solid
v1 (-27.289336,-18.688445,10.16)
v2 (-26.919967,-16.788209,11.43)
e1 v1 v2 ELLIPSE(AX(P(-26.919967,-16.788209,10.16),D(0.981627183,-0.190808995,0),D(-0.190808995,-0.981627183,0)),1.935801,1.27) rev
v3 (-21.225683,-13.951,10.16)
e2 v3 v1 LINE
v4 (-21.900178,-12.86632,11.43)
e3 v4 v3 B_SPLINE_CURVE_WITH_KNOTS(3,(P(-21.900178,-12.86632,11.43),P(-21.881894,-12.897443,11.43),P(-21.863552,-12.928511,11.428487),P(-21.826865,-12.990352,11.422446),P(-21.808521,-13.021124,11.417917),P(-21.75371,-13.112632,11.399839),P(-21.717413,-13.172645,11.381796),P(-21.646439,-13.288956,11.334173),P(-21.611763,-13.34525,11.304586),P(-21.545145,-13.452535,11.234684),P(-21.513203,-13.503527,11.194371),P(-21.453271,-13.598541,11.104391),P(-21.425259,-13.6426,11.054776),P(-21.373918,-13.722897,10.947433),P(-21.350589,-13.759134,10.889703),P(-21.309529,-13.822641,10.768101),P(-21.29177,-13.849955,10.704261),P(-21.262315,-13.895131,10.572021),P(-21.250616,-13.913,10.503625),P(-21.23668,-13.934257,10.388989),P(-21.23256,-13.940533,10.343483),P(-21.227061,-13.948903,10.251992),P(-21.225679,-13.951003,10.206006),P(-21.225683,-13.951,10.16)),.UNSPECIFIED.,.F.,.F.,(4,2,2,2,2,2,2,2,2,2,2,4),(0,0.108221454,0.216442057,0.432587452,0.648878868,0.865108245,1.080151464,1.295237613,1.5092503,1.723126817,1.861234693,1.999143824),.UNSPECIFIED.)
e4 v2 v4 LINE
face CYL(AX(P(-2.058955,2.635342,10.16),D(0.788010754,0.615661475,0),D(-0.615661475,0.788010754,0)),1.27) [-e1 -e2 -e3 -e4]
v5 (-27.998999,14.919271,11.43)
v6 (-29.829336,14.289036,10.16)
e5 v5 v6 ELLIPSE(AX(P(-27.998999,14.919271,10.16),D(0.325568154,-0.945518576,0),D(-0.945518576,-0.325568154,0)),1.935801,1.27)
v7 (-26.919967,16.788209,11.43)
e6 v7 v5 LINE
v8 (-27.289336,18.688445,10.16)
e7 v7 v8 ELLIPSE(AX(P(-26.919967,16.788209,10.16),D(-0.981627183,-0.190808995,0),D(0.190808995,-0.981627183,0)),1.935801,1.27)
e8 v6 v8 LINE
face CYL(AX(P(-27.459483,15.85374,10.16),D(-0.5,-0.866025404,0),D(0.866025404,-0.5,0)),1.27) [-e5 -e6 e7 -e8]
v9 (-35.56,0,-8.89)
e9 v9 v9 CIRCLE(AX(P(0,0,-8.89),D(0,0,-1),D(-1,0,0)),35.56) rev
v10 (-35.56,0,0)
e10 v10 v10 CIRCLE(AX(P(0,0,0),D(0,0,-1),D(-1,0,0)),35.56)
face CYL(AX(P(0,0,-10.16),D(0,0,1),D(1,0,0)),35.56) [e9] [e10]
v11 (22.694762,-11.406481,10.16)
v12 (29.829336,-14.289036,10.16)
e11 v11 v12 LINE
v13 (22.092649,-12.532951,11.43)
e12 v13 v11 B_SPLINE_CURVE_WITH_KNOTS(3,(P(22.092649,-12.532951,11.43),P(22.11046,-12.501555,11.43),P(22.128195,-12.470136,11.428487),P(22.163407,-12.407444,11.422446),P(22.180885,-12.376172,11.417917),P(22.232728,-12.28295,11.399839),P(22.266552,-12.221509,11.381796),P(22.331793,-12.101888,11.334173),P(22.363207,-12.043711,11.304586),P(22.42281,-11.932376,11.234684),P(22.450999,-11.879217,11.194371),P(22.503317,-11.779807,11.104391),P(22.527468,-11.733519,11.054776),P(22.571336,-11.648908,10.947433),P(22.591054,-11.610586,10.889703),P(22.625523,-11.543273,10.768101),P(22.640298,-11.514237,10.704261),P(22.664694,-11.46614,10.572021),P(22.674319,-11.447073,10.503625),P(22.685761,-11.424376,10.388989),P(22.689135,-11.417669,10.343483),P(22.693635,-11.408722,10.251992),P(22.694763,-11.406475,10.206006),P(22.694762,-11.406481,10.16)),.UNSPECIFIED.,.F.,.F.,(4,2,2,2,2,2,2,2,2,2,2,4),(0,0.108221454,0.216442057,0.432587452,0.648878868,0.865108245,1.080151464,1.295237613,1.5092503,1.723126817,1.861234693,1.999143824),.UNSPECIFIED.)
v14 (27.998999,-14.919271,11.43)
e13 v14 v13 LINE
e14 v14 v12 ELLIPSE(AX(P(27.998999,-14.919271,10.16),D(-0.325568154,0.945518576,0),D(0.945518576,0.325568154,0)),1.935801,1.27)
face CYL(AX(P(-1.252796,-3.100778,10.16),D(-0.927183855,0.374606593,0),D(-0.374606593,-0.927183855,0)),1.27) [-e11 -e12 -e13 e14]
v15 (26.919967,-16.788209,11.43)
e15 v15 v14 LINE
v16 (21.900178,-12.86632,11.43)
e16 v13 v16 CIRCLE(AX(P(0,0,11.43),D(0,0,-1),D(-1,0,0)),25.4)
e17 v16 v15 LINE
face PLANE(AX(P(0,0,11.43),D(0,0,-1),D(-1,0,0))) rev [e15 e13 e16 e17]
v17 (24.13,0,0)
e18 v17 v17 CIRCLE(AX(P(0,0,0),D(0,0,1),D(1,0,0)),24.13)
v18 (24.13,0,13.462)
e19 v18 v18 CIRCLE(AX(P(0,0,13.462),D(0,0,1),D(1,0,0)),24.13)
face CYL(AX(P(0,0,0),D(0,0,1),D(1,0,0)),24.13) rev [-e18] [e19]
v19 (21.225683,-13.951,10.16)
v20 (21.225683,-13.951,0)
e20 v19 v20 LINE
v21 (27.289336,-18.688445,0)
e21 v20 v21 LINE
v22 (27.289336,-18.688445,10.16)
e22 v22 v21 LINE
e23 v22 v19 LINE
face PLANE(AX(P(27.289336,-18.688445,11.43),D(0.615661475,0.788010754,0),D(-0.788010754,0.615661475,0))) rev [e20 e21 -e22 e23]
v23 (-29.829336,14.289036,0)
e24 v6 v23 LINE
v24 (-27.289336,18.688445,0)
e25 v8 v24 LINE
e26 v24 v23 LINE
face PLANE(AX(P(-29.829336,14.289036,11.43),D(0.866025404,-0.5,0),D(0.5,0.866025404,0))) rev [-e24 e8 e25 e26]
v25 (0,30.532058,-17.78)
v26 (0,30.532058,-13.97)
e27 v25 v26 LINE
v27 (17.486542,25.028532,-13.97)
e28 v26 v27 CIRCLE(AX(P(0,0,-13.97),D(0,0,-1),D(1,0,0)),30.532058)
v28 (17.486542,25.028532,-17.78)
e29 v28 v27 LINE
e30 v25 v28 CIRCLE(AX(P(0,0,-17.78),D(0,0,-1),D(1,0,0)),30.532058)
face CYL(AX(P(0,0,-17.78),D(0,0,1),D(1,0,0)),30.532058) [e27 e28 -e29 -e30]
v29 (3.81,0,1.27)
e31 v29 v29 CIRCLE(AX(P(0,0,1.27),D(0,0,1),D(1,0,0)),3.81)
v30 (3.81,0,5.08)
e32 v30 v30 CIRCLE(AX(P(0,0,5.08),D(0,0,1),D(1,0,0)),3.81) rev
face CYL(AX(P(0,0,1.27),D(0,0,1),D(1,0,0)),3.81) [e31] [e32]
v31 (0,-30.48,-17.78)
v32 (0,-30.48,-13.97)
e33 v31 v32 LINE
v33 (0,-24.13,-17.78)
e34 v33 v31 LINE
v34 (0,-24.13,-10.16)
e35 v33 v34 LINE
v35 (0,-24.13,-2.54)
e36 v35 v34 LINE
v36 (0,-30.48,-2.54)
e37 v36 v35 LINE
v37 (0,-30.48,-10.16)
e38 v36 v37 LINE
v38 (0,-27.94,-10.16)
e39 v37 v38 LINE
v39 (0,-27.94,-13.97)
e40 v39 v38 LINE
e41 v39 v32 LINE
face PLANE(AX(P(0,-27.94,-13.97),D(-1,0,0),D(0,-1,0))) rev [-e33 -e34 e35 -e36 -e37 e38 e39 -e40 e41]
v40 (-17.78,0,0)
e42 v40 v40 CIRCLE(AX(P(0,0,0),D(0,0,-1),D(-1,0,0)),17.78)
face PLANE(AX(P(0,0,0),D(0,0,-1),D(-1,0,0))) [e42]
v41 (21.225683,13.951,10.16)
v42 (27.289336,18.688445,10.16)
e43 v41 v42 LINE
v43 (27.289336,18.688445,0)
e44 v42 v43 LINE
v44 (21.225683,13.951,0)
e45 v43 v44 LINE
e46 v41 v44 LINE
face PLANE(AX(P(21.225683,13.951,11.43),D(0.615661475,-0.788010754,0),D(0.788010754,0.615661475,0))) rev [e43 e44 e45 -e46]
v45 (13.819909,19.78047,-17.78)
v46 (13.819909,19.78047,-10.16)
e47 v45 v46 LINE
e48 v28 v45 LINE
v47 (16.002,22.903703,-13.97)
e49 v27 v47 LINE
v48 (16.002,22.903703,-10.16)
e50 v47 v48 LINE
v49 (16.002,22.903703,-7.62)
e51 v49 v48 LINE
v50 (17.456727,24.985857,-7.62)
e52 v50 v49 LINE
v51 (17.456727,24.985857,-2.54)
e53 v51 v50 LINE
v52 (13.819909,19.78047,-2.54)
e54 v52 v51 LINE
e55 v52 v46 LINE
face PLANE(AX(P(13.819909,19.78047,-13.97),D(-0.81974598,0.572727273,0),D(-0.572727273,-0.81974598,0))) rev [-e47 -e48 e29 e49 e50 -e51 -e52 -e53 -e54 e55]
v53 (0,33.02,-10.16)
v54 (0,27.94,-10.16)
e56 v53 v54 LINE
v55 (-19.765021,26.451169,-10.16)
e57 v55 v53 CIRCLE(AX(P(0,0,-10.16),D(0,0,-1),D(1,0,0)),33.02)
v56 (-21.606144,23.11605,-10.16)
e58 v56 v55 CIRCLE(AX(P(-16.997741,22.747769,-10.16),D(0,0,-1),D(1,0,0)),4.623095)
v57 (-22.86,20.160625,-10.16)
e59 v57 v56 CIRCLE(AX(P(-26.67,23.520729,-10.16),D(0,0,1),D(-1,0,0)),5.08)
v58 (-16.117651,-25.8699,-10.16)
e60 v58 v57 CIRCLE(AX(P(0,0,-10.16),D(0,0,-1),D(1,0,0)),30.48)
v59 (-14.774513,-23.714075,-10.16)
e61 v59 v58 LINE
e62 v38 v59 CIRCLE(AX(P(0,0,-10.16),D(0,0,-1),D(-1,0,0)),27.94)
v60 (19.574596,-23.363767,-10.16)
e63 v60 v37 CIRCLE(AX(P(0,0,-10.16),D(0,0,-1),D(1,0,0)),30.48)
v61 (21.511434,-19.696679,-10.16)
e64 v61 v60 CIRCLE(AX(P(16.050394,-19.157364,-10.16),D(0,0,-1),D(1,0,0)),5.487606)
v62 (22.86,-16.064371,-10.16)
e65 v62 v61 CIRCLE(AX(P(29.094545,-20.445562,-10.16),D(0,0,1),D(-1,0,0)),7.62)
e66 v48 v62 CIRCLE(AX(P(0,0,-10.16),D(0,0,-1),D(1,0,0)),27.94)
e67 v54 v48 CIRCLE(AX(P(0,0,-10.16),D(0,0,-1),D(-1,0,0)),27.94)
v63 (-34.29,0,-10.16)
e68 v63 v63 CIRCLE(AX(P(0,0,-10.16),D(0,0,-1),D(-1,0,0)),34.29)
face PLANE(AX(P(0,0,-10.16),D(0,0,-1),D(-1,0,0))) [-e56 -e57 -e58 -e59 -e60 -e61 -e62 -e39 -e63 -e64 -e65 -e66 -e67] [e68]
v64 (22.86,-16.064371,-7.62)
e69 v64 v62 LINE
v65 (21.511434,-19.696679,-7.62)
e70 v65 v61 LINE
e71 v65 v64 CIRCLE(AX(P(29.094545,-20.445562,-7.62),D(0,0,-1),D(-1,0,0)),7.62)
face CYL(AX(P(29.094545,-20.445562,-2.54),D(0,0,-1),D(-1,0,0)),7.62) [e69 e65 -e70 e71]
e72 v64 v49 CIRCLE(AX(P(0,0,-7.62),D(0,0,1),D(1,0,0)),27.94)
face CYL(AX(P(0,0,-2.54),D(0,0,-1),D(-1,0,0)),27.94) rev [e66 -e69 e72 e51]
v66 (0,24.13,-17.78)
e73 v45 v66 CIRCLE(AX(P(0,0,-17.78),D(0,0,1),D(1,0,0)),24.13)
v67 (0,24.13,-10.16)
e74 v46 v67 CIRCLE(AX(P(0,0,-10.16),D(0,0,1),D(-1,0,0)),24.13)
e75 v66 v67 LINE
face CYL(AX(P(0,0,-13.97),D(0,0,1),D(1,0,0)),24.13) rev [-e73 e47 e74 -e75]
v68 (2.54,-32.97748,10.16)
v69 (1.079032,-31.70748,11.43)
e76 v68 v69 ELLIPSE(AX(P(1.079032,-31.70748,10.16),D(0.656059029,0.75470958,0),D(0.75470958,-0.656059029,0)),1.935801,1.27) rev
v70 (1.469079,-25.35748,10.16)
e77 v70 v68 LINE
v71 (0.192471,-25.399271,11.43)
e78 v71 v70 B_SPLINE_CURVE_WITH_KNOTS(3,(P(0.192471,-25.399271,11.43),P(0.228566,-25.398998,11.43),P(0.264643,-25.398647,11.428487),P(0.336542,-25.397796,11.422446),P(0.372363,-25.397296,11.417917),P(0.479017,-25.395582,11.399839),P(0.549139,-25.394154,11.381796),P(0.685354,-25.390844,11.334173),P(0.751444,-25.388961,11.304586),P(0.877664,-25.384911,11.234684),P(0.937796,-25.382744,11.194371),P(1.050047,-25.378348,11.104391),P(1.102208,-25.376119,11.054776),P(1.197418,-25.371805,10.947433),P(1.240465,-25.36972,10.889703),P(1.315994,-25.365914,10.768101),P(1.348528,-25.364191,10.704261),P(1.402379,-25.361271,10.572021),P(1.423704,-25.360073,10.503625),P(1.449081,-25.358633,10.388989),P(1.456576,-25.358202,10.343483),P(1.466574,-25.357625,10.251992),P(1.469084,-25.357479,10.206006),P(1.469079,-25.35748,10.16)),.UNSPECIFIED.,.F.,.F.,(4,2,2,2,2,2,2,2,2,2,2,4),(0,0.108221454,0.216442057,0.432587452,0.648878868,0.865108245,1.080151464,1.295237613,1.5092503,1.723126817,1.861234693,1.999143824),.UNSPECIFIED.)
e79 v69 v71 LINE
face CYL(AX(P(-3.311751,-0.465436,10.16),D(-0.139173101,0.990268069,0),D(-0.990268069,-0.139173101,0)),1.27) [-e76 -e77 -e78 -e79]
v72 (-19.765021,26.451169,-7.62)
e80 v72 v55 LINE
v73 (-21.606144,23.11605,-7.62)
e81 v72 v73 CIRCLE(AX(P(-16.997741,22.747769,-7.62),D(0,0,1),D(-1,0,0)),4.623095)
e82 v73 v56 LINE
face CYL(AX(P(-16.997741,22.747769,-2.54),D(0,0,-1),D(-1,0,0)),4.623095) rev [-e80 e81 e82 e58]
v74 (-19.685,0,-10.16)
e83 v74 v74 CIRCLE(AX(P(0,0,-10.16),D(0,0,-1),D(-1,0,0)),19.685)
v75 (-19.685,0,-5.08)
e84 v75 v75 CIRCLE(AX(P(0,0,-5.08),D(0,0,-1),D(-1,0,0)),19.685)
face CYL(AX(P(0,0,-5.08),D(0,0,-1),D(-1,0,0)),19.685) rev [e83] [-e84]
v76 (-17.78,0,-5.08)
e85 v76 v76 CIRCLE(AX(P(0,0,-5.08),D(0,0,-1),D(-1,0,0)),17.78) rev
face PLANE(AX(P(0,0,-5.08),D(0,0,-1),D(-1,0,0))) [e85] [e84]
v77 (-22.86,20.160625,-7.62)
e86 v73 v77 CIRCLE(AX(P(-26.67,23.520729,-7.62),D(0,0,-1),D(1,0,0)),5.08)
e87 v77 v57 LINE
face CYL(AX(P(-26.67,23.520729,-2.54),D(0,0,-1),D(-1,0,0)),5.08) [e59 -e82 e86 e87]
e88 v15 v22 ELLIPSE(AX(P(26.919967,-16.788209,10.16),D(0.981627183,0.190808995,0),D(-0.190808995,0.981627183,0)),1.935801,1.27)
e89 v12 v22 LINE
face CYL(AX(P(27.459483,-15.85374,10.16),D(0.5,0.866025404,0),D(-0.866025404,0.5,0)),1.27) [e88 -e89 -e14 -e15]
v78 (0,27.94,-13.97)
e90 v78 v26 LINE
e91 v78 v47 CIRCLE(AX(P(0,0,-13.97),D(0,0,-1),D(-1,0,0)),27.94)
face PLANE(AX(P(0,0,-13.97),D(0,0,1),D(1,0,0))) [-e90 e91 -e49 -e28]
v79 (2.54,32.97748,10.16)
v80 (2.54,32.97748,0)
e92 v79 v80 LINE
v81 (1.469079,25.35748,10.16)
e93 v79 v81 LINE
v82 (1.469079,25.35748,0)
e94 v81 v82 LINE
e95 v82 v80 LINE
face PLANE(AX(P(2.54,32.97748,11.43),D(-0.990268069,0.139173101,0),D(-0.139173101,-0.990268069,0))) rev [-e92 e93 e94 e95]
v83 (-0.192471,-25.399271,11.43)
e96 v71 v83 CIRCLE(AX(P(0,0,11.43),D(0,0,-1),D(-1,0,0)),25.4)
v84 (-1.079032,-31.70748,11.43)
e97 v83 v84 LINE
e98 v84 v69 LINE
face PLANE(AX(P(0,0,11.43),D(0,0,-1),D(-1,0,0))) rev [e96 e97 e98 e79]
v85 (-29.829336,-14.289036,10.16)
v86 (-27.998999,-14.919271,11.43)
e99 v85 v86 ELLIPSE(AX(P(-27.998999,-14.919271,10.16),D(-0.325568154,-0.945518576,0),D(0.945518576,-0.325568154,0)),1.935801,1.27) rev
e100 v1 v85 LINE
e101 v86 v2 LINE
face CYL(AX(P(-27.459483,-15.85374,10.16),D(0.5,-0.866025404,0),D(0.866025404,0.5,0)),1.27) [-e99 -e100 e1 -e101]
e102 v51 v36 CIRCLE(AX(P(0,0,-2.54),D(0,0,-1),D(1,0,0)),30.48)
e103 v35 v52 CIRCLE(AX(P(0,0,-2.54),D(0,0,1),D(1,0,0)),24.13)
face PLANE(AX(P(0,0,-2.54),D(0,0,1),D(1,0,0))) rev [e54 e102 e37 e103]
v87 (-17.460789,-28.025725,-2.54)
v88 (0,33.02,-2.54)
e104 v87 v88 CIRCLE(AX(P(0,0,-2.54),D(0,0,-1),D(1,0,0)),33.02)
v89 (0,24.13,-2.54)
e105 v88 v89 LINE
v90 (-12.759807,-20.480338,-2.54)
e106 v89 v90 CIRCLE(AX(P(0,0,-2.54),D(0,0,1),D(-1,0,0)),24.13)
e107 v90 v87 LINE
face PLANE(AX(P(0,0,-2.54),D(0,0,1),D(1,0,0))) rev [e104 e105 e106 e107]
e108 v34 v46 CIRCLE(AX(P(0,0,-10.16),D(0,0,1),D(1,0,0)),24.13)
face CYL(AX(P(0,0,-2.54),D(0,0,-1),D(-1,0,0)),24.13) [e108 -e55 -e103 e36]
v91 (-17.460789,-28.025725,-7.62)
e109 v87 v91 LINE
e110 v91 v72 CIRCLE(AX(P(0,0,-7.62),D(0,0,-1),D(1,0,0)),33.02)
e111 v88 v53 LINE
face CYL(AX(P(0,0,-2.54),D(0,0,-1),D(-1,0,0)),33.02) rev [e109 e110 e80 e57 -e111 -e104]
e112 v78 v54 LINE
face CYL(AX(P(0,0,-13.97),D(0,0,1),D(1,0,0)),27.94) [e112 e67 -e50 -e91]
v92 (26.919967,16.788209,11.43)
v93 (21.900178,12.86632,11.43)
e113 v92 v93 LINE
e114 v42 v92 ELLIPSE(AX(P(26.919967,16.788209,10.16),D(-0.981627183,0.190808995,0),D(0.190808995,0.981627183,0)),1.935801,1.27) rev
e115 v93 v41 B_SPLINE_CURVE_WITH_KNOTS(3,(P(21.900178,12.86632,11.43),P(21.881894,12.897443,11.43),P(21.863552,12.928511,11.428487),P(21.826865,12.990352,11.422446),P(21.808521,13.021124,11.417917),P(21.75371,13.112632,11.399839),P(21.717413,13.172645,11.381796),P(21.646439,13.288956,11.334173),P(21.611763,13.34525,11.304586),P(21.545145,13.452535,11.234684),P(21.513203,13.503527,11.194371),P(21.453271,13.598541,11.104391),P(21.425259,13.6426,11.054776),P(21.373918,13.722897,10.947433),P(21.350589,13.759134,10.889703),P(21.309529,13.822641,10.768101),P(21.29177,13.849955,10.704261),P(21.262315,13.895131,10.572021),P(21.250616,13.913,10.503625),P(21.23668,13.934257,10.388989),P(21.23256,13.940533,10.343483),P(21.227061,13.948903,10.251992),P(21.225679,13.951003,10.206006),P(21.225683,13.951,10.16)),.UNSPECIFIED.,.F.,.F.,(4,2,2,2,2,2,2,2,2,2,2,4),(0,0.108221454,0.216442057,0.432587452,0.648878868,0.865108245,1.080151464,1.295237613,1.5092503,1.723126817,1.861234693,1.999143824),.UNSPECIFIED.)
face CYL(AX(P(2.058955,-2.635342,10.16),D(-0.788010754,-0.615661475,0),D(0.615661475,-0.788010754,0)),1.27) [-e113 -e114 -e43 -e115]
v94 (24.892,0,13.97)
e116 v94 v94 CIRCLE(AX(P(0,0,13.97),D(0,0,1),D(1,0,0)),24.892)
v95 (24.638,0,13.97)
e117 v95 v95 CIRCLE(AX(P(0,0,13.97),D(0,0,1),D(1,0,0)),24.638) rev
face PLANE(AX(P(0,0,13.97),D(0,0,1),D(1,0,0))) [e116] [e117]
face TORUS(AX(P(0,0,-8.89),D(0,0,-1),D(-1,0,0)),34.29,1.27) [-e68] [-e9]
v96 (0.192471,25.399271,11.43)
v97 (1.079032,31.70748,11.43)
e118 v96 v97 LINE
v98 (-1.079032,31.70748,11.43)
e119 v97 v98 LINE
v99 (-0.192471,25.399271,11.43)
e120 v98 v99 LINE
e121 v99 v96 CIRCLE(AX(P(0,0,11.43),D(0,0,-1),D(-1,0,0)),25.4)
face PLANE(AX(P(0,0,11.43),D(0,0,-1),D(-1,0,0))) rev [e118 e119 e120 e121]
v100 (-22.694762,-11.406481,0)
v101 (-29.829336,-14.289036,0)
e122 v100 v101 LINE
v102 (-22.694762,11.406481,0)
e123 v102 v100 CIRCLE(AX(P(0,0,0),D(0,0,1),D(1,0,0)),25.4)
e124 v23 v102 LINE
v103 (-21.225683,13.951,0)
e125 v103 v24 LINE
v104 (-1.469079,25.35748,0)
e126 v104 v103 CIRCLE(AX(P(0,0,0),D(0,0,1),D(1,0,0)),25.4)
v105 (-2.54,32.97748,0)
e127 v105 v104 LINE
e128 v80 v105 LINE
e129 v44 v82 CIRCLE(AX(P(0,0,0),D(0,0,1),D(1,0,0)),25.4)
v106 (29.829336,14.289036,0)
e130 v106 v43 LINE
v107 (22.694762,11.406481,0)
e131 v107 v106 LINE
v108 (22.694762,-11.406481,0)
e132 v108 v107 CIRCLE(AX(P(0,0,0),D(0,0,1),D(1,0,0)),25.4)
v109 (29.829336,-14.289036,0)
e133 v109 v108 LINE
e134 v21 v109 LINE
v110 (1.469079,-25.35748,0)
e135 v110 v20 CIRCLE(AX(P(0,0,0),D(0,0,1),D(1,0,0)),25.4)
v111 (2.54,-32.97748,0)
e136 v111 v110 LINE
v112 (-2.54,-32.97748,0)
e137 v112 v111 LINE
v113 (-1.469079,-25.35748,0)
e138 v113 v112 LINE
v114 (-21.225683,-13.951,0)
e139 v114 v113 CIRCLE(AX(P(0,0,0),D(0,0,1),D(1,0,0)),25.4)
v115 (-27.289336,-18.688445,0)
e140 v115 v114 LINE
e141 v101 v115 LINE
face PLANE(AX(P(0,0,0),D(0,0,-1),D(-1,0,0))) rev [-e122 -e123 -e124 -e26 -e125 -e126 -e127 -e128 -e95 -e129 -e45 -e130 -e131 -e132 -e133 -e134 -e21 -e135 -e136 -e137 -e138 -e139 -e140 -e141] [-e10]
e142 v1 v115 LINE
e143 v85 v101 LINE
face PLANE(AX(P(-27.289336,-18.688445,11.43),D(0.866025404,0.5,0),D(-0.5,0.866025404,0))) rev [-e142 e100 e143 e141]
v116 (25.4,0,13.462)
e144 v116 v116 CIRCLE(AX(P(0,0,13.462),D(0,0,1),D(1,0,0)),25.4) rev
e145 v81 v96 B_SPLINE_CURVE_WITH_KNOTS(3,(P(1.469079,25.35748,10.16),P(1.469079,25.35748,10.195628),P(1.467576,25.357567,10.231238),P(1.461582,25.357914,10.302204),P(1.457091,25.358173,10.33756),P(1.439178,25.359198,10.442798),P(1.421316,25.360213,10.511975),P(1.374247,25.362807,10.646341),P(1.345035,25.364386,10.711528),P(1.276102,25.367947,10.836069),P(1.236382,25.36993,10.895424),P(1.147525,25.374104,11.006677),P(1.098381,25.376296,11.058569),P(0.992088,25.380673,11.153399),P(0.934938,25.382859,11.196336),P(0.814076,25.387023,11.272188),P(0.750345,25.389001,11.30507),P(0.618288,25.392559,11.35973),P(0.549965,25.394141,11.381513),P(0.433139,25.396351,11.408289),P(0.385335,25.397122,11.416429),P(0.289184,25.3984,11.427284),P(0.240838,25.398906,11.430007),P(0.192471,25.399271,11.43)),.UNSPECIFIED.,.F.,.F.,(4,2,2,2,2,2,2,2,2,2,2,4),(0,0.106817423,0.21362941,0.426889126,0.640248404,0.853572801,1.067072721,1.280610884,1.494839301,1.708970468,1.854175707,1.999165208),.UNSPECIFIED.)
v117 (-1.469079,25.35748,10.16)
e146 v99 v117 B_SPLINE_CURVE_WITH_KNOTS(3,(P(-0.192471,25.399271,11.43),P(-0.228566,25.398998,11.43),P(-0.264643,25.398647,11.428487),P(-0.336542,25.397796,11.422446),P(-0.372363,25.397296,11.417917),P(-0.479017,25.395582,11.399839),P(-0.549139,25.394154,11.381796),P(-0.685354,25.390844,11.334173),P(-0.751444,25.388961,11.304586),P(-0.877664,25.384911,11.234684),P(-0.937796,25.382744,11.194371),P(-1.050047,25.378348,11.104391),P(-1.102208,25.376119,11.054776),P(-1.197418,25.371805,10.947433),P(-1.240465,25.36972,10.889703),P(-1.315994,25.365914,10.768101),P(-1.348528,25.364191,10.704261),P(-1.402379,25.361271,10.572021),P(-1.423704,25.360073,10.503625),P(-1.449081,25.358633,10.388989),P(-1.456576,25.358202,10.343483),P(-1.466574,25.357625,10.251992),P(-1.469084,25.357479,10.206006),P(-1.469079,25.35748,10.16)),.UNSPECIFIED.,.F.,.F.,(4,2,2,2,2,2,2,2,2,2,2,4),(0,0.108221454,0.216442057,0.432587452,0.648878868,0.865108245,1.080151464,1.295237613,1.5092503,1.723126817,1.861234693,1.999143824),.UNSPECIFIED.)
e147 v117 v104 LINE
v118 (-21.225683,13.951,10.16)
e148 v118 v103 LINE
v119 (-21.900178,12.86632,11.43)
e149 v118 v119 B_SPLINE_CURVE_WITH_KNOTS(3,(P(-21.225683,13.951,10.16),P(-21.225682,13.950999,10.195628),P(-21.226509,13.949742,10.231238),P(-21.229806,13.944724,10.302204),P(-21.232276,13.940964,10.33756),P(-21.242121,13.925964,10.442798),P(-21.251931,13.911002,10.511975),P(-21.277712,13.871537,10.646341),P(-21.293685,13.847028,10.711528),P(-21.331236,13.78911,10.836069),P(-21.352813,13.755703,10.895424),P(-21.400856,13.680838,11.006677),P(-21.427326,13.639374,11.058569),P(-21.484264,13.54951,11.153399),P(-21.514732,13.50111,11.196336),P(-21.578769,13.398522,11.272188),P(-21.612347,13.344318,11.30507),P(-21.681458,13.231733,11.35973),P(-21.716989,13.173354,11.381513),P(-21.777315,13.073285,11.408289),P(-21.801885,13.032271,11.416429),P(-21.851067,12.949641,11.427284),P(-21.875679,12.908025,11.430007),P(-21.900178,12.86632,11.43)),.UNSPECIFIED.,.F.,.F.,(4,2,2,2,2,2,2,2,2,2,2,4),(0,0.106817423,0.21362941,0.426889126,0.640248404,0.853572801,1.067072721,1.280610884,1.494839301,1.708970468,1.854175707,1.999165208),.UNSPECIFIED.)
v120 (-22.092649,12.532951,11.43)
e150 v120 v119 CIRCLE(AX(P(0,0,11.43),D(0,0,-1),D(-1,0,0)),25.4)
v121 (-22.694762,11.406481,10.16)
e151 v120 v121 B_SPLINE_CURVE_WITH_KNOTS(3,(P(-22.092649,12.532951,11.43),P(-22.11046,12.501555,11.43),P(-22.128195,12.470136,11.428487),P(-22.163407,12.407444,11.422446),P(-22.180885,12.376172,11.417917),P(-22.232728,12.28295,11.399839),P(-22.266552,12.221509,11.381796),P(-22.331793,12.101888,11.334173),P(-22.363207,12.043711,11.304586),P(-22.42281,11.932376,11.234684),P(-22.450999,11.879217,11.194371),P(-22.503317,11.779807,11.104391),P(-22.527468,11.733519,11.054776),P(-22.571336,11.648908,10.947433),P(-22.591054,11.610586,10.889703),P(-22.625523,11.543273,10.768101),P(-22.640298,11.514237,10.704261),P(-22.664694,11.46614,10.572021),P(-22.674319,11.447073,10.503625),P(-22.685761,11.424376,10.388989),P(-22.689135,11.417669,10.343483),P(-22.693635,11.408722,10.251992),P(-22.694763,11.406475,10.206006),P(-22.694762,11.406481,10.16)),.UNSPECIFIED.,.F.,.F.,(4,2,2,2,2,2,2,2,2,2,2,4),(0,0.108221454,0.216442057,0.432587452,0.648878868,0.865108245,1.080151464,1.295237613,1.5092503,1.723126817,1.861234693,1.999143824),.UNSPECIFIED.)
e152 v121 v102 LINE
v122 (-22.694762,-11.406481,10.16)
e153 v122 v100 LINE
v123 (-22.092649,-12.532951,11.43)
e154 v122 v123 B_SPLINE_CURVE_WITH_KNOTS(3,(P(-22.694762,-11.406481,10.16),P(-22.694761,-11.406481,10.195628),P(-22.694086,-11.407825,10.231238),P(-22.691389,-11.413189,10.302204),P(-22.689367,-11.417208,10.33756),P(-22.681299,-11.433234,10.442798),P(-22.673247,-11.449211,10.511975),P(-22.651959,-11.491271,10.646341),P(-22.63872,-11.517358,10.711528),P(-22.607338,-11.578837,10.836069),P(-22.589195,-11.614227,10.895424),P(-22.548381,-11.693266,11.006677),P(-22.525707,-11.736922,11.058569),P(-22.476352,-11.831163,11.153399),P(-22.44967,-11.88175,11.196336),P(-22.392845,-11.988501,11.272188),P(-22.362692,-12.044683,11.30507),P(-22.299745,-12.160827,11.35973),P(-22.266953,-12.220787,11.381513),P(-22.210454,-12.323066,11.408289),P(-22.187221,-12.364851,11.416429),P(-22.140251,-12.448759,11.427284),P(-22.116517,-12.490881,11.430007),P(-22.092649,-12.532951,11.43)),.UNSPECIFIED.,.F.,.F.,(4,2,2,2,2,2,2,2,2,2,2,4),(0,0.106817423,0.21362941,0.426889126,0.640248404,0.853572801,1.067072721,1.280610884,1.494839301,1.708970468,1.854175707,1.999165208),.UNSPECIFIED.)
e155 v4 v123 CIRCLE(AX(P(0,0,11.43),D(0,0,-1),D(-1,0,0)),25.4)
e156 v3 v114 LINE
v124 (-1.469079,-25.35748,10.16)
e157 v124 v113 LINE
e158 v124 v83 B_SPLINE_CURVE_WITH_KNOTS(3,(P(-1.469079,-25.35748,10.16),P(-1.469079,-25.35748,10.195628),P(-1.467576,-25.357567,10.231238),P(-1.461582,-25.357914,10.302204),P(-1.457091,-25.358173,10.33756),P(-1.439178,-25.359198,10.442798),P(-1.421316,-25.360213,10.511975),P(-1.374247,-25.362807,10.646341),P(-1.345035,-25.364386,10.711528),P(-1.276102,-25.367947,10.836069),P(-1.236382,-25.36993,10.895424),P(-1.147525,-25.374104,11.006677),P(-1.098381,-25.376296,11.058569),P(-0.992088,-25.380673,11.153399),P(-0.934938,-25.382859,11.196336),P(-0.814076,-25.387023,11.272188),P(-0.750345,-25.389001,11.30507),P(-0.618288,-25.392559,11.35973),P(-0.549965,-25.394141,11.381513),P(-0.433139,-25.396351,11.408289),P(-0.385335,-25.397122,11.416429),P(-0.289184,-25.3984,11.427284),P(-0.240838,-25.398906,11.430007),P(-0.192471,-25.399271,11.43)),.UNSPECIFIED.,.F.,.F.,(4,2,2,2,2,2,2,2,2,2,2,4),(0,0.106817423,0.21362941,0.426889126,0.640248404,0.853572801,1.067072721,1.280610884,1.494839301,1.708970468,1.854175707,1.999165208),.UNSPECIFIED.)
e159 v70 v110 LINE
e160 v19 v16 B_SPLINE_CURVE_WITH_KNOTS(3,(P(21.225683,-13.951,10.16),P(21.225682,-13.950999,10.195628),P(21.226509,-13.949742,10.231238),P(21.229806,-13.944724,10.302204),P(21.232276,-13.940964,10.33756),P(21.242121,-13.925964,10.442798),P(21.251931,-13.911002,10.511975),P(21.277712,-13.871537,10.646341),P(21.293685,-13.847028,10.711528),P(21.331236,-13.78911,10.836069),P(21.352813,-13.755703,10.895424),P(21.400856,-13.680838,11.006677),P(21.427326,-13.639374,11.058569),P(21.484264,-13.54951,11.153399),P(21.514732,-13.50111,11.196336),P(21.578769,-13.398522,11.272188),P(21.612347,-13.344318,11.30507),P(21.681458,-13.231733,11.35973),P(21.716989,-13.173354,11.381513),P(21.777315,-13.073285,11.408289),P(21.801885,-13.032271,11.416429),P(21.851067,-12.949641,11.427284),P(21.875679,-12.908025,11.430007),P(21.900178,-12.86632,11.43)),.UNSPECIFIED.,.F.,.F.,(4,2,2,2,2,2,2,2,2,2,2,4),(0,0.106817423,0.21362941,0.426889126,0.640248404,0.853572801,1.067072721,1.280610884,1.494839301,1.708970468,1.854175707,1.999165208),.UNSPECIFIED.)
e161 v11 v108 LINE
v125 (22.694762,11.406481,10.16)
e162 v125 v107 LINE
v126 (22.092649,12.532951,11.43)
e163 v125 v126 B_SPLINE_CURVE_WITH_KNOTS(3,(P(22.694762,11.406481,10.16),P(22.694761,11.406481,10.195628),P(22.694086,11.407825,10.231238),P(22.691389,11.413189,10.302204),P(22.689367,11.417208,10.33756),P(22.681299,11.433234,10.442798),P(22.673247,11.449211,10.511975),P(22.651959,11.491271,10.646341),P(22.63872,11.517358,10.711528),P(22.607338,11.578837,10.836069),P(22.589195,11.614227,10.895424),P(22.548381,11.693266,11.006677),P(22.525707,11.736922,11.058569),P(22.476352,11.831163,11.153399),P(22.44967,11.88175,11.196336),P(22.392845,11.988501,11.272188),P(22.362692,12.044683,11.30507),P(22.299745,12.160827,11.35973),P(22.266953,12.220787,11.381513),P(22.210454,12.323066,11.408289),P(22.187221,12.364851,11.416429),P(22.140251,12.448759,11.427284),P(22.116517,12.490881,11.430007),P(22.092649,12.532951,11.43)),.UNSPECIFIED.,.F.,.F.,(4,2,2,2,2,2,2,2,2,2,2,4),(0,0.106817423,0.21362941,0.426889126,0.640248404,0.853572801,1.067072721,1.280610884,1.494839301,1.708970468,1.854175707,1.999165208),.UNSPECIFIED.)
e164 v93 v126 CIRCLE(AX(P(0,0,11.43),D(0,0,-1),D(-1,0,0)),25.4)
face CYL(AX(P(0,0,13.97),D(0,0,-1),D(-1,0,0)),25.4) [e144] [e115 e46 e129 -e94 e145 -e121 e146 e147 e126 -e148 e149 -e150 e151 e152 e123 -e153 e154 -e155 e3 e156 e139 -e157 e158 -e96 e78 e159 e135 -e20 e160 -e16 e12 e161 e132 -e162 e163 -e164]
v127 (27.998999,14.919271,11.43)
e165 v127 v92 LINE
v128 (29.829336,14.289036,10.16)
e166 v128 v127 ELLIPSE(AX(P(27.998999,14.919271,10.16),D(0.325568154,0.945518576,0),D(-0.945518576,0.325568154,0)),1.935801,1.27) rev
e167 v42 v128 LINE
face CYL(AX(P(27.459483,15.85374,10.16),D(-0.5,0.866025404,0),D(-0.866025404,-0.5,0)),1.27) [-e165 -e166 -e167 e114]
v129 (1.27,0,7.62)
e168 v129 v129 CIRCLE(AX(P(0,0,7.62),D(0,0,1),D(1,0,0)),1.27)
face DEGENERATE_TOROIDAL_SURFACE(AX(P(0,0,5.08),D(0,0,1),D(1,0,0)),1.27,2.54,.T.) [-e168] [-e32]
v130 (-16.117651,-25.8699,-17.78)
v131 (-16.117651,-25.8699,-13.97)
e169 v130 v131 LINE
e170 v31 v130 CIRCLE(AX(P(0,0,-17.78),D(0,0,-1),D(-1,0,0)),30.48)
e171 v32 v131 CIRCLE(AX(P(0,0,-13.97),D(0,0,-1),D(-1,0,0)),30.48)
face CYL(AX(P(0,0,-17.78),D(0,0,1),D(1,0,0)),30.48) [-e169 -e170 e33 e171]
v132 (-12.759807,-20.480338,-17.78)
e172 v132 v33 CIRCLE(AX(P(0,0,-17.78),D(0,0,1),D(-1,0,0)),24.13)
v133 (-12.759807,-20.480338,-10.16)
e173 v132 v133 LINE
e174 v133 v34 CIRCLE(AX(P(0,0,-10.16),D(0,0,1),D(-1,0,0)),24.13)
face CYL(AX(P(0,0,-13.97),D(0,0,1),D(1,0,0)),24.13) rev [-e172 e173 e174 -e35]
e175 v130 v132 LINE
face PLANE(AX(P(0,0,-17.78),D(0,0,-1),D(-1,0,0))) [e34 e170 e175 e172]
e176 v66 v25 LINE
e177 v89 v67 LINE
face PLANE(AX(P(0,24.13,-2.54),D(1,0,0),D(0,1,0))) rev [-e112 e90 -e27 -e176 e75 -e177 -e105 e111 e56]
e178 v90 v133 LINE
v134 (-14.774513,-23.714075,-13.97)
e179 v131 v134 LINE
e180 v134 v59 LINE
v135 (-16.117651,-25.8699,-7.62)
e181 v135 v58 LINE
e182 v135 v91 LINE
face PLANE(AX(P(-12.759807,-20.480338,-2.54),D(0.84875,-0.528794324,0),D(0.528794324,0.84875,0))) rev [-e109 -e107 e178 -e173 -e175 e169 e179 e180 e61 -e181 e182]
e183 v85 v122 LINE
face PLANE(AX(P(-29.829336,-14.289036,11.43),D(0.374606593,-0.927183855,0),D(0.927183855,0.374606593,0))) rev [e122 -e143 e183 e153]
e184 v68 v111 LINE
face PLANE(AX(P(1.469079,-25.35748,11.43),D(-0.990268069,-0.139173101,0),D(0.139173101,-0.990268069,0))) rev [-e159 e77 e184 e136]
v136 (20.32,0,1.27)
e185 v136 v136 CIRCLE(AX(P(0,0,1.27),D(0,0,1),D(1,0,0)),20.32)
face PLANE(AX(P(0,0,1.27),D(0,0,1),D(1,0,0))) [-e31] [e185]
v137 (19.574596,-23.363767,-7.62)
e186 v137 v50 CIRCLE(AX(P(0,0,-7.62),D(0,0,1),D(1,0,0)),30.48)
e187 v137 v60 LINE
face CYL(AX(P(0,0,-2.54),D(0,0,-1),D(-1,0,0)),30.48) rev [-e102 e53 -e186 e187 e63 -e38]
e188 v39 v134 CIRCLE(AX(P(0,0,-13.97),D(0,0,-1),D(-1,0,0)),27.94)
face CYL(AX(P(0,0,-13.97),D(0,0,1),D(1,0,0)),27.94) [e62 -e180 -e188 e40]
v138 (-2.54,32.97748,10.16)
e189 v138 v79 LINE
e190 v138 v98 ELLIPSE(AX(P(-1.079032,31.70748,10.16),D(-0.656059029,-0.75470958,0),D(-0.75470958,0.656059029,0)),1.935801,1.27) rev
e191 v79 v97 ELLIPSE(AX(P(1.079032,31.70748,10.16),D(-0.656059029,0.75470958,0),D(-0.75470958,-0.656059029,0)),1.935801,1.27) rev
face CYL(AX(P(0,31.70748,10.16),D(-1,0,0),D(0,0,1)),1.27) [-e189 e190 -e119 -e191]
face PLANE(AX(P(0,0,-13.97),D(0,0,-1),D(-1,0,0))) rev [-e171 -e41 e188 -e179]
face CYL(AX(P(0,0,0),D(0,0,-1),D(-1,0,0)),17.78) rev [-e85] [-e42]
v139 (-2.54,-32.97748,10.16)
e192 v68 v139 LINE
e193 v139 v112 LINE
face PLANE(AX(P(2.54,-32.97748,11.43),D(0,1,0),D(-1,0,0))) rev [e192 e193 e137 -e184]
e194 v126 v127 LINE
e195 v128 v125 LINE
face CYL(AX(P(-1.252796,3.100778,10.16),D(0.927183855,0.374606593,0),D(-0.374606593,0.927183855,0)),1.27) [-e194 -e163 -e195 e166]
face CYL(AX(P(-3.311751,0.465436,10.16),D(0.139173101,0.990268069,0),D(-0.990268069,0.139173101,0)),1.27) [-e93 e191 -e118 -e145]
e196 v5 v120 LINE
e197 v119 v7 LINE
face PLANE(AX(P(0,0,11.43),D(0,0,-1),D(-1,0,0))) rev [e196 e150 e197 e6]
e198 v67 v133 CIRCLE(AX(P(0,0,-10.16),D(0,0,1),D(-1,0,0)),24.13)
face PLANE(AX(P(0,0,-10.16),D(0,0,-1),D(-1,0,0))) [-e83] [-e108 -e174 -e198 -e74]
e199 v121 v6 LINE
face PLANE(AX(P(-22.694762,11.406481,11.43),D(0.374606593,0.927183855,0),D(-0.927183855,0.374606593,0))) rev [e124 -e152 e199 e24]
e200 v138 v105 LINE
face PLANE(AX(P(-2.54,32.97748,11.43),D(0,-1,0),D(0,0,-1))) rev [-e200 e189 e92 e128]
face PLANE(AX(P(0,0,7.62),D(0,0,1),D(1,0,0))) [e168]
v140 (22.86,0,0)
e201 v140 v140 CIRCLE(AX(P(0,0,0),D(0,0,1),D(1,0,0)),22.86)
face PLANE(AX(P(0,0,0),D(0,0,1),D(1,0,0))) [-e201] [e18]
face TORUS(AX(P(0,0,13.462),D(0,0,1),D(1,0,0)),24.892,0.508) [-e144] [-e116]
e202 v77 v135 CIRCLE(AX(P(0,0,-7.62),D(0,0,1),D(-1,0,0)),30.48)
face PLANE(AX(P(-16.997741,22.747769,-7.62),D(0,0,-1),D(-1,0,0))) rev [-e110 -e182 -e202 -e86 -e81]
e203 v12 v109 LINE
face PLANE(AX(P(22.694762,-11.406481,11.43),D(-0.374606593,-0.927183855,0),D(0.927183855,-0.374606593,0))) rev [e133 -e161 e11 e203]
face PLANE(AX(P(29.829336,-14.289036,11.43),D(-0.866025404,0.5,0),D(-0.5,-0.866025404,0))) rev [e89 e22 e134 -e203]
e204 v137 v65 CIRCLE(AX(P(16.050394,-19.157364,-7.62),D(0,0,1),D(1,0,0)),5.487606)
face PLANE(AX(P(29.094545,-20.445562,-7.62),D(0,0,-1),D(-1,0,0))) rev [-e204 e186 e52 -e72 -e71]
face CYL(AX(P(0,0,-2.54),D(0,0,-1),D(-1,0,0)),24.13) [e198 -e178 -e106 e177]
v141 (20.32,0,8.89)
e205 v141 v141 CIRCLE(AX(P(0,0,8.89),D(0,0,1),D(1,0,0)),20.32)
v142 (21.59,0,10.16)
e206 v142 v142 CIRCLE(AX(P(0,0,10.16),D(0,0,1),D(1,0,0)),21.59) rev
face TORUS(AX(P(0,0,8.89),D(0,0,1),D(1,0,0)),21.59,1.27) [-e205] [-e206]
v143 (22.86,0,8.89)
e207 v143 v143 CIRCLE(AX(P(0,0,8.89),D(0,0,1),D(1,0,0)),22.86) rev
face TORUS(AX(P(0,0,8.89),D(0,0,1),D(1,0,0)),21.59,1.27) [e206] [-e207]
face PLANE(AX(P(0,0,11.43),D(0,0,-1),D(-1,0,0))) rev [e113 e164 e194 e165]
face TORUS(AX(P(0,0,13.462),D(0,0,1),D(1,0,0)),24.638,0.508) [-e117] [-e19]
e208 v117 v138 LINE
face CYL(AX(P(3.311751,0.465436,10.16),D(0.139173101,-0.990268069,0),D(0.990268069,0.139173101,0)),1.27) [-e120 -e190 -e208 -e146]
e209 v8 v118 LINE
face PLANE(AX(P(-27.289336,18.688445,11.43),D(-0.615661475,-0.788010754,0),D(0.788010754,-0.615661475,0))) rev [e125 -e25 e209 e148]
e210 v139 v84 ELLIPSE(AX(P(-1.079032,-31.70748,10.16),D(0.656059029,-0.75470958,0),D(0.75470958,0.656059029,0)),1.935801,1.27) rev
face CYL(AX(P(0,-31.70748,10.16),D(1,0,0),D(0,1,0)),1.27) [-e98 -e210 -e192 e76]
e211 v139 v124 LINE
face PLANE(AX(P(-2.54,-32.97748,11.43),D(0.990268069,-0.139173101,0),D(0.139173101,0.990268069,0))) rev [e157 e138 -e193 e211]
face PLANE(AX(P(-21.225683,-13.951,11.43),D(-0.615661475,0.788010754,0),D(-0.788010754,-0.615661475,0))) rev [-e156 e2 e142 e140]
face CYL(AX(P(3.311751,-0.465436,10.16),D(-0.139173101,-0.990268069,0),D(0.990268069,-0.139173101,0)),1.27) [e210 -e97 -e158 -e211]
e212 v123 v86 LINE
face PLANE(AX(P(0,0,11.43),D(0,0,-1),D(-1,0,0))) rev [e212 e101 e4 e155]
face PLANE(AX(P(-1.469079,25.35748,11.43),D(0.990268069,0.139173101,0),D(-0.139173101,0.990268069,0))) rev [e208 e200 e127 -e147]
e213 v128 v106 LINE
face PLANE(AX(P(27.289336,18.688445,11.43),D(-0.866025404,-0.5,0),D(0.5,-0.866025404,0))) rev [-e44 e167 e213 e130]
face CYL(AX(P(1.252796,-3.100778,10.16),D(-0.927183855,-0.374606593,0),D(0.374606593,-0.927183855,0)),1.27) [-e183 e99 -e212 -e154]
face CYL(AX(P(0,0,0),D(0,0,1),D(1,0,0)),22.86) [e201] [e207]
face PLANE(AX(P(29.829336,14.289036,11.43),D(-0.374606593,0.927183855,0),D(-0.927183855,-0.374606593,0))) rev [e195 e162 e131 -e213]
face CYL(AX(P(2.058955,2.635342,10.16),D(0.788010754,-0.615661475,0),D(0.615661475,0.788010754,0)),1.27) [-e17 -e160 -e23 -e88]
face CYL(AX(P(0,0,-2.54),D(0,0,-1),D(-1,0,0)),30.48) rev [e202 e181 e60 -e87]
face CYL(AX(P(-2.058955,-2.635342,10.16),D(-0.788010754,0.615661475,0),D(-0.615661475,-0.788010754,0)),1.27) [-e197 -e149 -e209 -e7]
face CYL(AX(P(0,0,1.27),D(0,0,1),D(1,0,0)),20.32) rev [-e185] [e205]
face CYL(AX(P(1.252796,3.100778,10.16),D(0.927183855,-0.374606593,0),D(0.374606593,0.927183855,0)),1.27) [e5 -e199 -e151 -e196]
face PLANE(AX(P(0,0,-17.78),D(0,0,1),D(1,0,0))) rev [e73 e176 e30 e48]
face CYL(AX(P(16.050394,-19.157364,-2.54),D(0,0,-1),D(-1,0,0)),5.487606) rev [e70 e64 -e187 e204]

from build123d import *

# Parameters (mm, degrees)
SKETCH1_R           = 25.4
BOSS_EXTRUDE1_DEPTH = 13.97
SKETCH3_R           = 35.56
BOSS_EXTRUDE2_DEPTH = 10.16
SKETCH4_R           = 17.78
CUT_EXTRUDE2_DEPTH  = 10.16
CUT_EXTRUDE3_DEPTH  = 7.62
CUT_EXTRUDE4_DEPTH  = 5.08
BOSS_EXTRUDE3_START = 3.81
BOSS_EXTRUDE3_DEPTH = 3.81
BOSS_EXTRUDE4_START = 3.81
BOSS_EXTRUDE4_DEPTH = 3.81
FILLET1_R           = 1.27
BOSS_EXTRUDE5_START = 3.81
BOSS_EXTRUDE5_DEPTH = 3.81
BOSS_EXTRUDE6_START = 3.81
BOSS_EXTRUDE6_DEPTH = 3.81
SKETCH12_R          = 19.685
SKETCH12_R_2        = 15.494
CUT_EXTRUDE5_DEPTH  = 5.08
CUT_EXTRUDE6_DEPTH  = 7.62
CUT_EXTRUDE7_DEPTH  = 5.08
CUT_EXTRUDE9_START  = -13.97
SKETCH17_R          = 24.13
SKETCH17_R_2        = 22.86
CUT_EXTRUDE9_DEPTH  = 13.97
SKETCH18_R          = 20.32
SKETCH18_R_2        = 19.05
CUT_EXTRUDE10_DEPTH = 12.7
SKETCH19_R          = 19.05
SKETCH19_R_2        = 3.81
CUT_EXTRUDE11_DEPTH = 12.7
SKETCH20_R          = 3.81
CUT_EXTRUDE12_DEPTH = 6.35
FILLET3_R           = 2.54
FILLET5_R           = 0.508
SKETCH21_R          = 22.86
SKETCH21_R_2        = 20.32
CUT_EXTRUDE13_DEPTH = 3.81
FILLET6_R           = 1.27
BOSS_EXTRUDE8_DEPTH = 11.43
FILLET7_R           = 1.27


with BuildPart() as part:
    # Sketch1 → Boss-Extrude1 (new body)
    with BuildSketch(Plane.XY):
        Circle(SKETCH1_R)
    extrude(amount=BOSS_EXTRUDE1_DEPTH)

    # Sketch3 → Boss-Extrude2 (add)
    with BuildSketch(Plane(origin=(0, 0, 0), x_dir=(-1, 0, 0), z_dir=(0, 0, -1))):
        Circle(SKETCH3_R)
    extrude(amount=BOSS_EXTRUDE2_DEPTH)

    # Sketch4 → Cut-Extrude2 (cut)
    with BuildSketch(Plane(origin=(0, 0, -10.16), x_dir=(-1, 0, 0), z_dir=(0, 0, -1))):
        Circle(SKETCH4_R)
    extrude(amount=-CUT_EXTRUDE2_DEPTH, mode=Mode.SUBTRACT)

    # Sketch5 → Cut-Extrude3 (cut)
    with BuildSketch(Plane(origin=(0, 0, -10.16), x_dir=(-1, 0, 0), z_dir=(0, 0, -1))):
        with BuildLine():
            Line((0, 24.13), (0, 33.02))
            ThreePointArc((0, 33.02), (10.414, 31.334789037), (19.765020777, 26.451169231))
            ThreePointArc((19.765020777, 26.451169231), (21.045077133, 24.982065605), (21.60614426, 23.11605022))
            ThreePointArc((21.60614426, 23.11605022), (21.993466722, 21.536683666), (22.86, 20.16062499))
            ThreePointArc((22.86, 20.16062499), (30.158193368, -4.417439617), (16.117651007, -25.8699))
            Line((16.117651007, -25.8699), (12.759807047, -20.4803375))
            ThreePointArc((12.759807047, -20.4803375), (23.199649177, 6.63575), (0, 24.13))
        make_face()
    extrude(amount=-CUT_EXTRUDE3_DEPTH, mode=Mode.SUBTRACT)

    # Sketch7 → Cut-Extrude4 (cut)
    with BuildSketch(Plane(origin=(0, 0, -7.62), x_dir=(-1, 0, 0), z_dir=(0, 0, -1))):
        with BuildLine():
            Line((17.460788591, -28.025725), (16.117651007, -25.8699))
            ThreePointArc((16.117651007, -25.8699), (30.158193368, -4.417439617), (22.86, 20.16062499))
            ThreePointArc((22.86, 20.16062499), (21.993466722, 21.536683666), (21.60614426, 23.11605022))
            ThreePointArc((21.60614426, 23.11605022), (21.045077133, 24.982065605), (19.765020777, 26.451169231))
            ThreePointArc((19.765020777, 26.451169231), (32.990501997, -1.395413186), (17.460788591, -28.025725))
        make_face()
    extrude(amount=-CUT_EXTRUDE4_DEPTH, mode=Mode.SUBTRACT)

    # Sketch8 → Boss-Extrude3 (add)
    with BuildSketch(Plane(origin=(0, 0, -10.16), x_dir=(-1, 0, 0), z_dir=(0, 0, -1)).offset(BOSS_EXTRUDE3_START)):
        with BuildLine():
            Line((0, -27.94), (0, -24.13))
            ThreePointArc((0, -24.13), (6.63575, -23.199649177), (12.759807047, -20.4803375))
            Line((12.759807047, -20.4803375), (14.774513423, -23.714075))
            ThreePointArc((14.774513423, -23.714075), (7.6835, -26.862751679), (0, -27.94))
        make_face()
    extrude(amount=-BOSS_EXTRUDE3_DEPTH)

    # Sketch9 → Boss-Extrude4 (add)
    with BuildSketch(Plane(origin=(0, 0, -13.97), x_dir=(-1, 0, 0), z_dir=(0, 0, -1)).offset(BOSS_EXTRUDE4_START)):
        with BuildLine():
            Line((0, -24.13), (0, -30.48))
            ThreePointArc((0, -30.48), (8.382, -29.304820013), (16.117651007, -25.8699))
            Line((16.117651007, -25.8699), (12.759807047, -20.4803375))
            ThreePointArc((12.759807047, -20.4803375), (6.63575, -23.199649177), (0, -24.13))
        make_face()
    extrude(amount=-BOSS_EXTRUDE4_DEPTH)

    # Fillet1
    fillet1_edges = [part.edges().sort_by_distance(p)[0] for p in [
        (35.56, 0, -10.16),
    ]]
    fillet(fillet1_edges, radius=FILLET1_R)

    # Sketch10 → Boss-Extrude5 (add)
    with BuildSketch(Plane(origin=(0, 0, -10.16), x_dir=(-1, 0, 0), z_dir=(0, 0, -1)).offset(BOSS_EXTRUDE5_START)):
        with BuildLine():
            Line((-13.819909091, 19.780470488), (-16.002, 22.90370267))
            ThreePointArc((-16.002, 22.90370267), (-8.387912356, 26.651201217), (0, 27.94))
            Line((0, 27.94), (0, 24.13))
            ThreePointArc((0, 24.13), (-7.244106126, 23.016946505), (-13.819909091, 19.780470488))
        make_face()
    extrude(amount=-BOSS_EXTRUDE5_DEPTH)

    # Sketch11 → Boss-Extrude6 (add)
    with BuildSketch(Plane(origin=(0, 0, -13.97), x_dir=(-1, 0, 0), z_dir=(0, 0, -1)).offset(BOSS_EXTRUDE6_START)):
        with BuildLine():
            Line((-13.819909091, 19.780470488), (-17.486542269, 25.028531737))
            ThreePointArc((-17.486542269, 25.028531737), (-9.166078238, 29.123694325), (0, 30.53205793))
            Line((0, 30.53205793), (0, 24.13))
            ThreePointArc((0, 24.13), (-7.244106126, 23.016946505), (-13.819909091, 19.780470488))
        make_face()
    extrude(amount=-BOSS_EXTRUDE6_DEPTH)

    # Sketch12 → Cut-Extrude5 (cut)
    with BuildSketch(Plane(origin=(0, 0, -10.16), x_dir=(-1, 0, 0), z_dir=(0, 0, -1))):
        Circle(SKETCH12_R)
        Circle(SKETCH12_R_2, mode=Mode.SUBTRACT)
    extrude(amount=-CUT_EXTRUDE5_DEPTH, mode=Mode.SUBTRACT)

    # Sketch13 → Cut-Extrude6 (cut)
    with BuildSketch(Plane(origin=(0, 0, -10.16), x_dir=(-1, 0, 0), z_dir=(0, 0, -1))):
        with BuildLine():
            Line((-16.002, 22.90370267), (-13.819909091, 19.780470488))
            ThreePointArc((-13.819909091, 19.780470488), (-23.016946505, -7.244106126), (0, -24.13))
            Line((0, -24.13), (0, -30.48))
            ThreePointArc((0, -30.48), (-10.414, -28.645750191), (-19.574595964, -23.363766667))
            ThreePointArc((-19.574595964, -23.363766667), (-20.902767484, -21.720232391), (-21.5114344, -19.696678812))
            ThreePointArc((-21.5114344, -19.696678812), (-21.950994255, -17.793379172), (-22.86, -16.064370514))
            ThreePointArc((-22.86, -16.064370514), (-27.51711182, 4.842742724), (-16.002, 22.90370267))
        make_face()
    extrude(amount=-CUT_EXTRUDE6_DEPTH, mode=Mode.SUBTRACT)

    # Sketch15 → Cut-Extrude7 (cut)
    with BuildSketch(Plane(origin=(0, 0, -7.62), x_dir=(-1, 0, 0), z_dir=(0, 0, -1))):
        with BuildLine():
            Line((-17.456727273, 24.985857458), (-16.002, 22.90370267))
            ThreePointArc((-16.002, 22.90370267), (-27.51711182, 4.842742724), (-22.86, -16.064370514))
            ThreePointArc((-22.86, -16.064370514), (-21.950994255, -17.793379172), (-21.5114344, -19.696678812))
            ThreePointArc((-21.5114344, -19.696678812), (-20.902767484, -21.720232391), (-19.574595964, -23.363766667))
            ThreePointArc((-19.574595964, -23.363766667), (-30.450800702, 1.333842788), (-17.456727273, 24.985857458))
        make_face()
    extrude(amount=-CUT_EXTRUDE7_DEPTH, mode=Mode.SUBTRACT)

    # Sketch17 → Cut-Extrude9 (cut)
    with BuildSketch(Plane.XY.offset(13.97).offset(CUT_EXTRUDE9_START)):
        Circle(SKETCH17_R)
        Circle(SKETCH17_R_2, mode=Mode.SUBTRACT)
    extrude(amount=CUT_EXTRUDE9_DEPTH, mode=Mode.SUBTRACT)

    # Sketch18 → Cut-Extrude10 (cut)
    with BuildSketch(Plane.XY.offset(13.97)):
        Circle(SKETCH18_R)
        Circle(SKETCH18_R_2, mode=Mode.SUBTRACT)
    extrude(amount=-CUT_EXTRUDE10_DEPTH, mode=Mode.SUBTRACT)

    # Sketch19 → Cut-Extrude11 (cut)
    with BuildSketch(Plane.XY.offset(13.97)):
        Circle(SKETCH19_R)
        Circle(SKETCH19_R_2, mode=Mode.SUBTRACT)
    extrude(amount=-CUT_EXTRUDE11_DEPTH, mode=Mode.SUBTRACT)

    # Sketch20 → Cut-Extrude12 (cut)
    with BuildSketch(Plane.XY.offset(13.97)):
        Circle(SKETCH20_R)
    extrude(amount=-CUT_EXTRUDE12_DEPTH, mode=Mode.SUBTRACT)

    # Fillet3
    fillet3_edges = [part.edges().sort_by_distance(p)[0] for p in [
        (-3.81, 0, 7.62),
    ]]
    fillet(fillet3_edges, radius=FILLET3_R)

    # Fillet5
    fillet5_edges = [part.edges().sort_by_distance(p)[0] for p in [
        (-24.13, 0, 13.97),
        (-25.4, 0, 13.97),
    ]]
    fillet(fillet5_edges, radius=FILLET5_R)

    # Sketch21 → Cut-Extrude13 (cut)
    with BuildSketch(Plane.XY.offset(13.97)):
        Circle(SKETCH21_R)
        Circle(SKETCH21_R_2, mode=Mode.SUBTRACT)
    extrude(amount=-CUT_EXTRUDE13_DEPTH, mode=Mode.SUBTRACT)

    # Fillet6
    fillet6_edges = [part.edges().sort_by_distance(p)[0] for p in [
        (-22.86, 0, 10.16),
        (-20.32, 0, 10.16),
    ]]
    fillet(fillet6_edges, radius=FILLET6_R - 0.0001)  # a hair under: the kernel refuses the full size

    # Sketch22 → Boss-Extrude8 (add)
    with BuildSketch(Plane.XY):
        with BuildLine():
            Line((-1.46907884, 25.357480304), (-2.54, 32.977480304))
            Line((-2.54, 32.977480304), (2.54, 32.977480304))
            Line((2.54, 32.977480304), (1.46907884, 25.357480304))
            ThreePointArc((1.46907884, 25.357480304), (0, 25.4), (-1.46907884, 25.357480304))
        make_face()
        with BuildLine():
            Line((21.225682699, 13.950999747), (27.289335696, 18.688444678))
            Line((27.289335696, 18.688444678), (29.829335696, 14.289035626))
            Line((29.829335696, 14.289035626), (22.694761539, 11.406480557))
            ThreePointArc((22.694761539, 11.406480557), (21.997045256, 12.7), (21.225682699, 13.950999747))
        make_face()
        with BuildLine():
            Line((22.694761539, -11.406480557), (29.829335696, -14.289035626))
            Line((29.829335696, -14.289035626), (27.289335696, -18.688444678))
            Line((27.289335696, -18.688444678), (21.225682699, -13.950999747))
            ThreePointArc((21.225682699, -13.950999747), (21.997045256, -12.7), (22.694761539, -11.406480557))
        make_face()
        with BuildLine():
            Line((1.46907884, -25.357480304), (2.54, -32.977480304))
            Line((2.54, -32.977480304), (-2.54, -32.977480304))
            Line((-2.54, -32.977480304), (-1.46907884, -25.357480304))
            ThreePointArc((-1.46907884, -25.357480304), (0, -25.4), (1.46907884, -25.357480304))
        make_face()
        with BuildLine():
            Line((-21.225682699, -13.950999747), (-27.289335696, -18.688444678))
            Line((-27.289335696, -18.688444678), (-29.829335696, -14.289035626))
            Line((-29.829335696, -14.289035626), (-22.694761539, -11.406480557))
            ThreePointArc((-22.694761539, -11.406480557), (-21.997045256, -12.7), (-21.225682699, -13.950999747))
        make_face()
        with BuildLine():
            Line((-22.694761539, 11.406480557), (-29.829335696, 14.289035626))
            Line((-29.829335696, 14.289035626), (-27.289335696, 18.688444678))
            Line((-27.289335696, 18.688444678), (-21.225682699, 13.950999747))
            ThreePointArc((-21.225682699, 13.950999747), (-21.997045256, 12.7), (-22.694761539, 11.406480557))
        make_face()
    extrude(amount=BOSS_EXTRUDE8_DEPTH)

    # Fillet7
    fillet7_edges = [part.edges().sort_by_distance(p)[0] for p in [
        (2.00453942, 29.167480304, 11.43),
        (0, 32.977480304, 11.43),
        (-2.00453942, 29.167480304, 11.43),
        (26.262048617, 12.847758092, 11.43),
        (28.559335696, 16.488740152, 11.43),
        (24.257509198, 16.319722212, 11.43),
        (24.257509198, -16.319722212, 11.43),
        (28.559335696, -16.488740152, 11.43),
        (26.262048617, -12.847758092, 11.43),
        (-2.00453942, -29.167480304, 11.43),
        (0, -32.977480304, 11.43),
        (2.00453942, -29.167480304, 11.43),
        (-26.262048617, -12.847758092, 11.43),
        (-28.559335696, -16.488740152, 11.43),
        (-24.257509198, -16.319722212, 11.43),
        (-24.257509198, 16.319722212, 11.43),
        (-28.559335696, 16.488740152, 11.43),
        (-26.262048617, 12.847758092, 11.43),
    ]]
    fillet(fillet7_edges, radius=FILLET7_R)


solid = part.part
